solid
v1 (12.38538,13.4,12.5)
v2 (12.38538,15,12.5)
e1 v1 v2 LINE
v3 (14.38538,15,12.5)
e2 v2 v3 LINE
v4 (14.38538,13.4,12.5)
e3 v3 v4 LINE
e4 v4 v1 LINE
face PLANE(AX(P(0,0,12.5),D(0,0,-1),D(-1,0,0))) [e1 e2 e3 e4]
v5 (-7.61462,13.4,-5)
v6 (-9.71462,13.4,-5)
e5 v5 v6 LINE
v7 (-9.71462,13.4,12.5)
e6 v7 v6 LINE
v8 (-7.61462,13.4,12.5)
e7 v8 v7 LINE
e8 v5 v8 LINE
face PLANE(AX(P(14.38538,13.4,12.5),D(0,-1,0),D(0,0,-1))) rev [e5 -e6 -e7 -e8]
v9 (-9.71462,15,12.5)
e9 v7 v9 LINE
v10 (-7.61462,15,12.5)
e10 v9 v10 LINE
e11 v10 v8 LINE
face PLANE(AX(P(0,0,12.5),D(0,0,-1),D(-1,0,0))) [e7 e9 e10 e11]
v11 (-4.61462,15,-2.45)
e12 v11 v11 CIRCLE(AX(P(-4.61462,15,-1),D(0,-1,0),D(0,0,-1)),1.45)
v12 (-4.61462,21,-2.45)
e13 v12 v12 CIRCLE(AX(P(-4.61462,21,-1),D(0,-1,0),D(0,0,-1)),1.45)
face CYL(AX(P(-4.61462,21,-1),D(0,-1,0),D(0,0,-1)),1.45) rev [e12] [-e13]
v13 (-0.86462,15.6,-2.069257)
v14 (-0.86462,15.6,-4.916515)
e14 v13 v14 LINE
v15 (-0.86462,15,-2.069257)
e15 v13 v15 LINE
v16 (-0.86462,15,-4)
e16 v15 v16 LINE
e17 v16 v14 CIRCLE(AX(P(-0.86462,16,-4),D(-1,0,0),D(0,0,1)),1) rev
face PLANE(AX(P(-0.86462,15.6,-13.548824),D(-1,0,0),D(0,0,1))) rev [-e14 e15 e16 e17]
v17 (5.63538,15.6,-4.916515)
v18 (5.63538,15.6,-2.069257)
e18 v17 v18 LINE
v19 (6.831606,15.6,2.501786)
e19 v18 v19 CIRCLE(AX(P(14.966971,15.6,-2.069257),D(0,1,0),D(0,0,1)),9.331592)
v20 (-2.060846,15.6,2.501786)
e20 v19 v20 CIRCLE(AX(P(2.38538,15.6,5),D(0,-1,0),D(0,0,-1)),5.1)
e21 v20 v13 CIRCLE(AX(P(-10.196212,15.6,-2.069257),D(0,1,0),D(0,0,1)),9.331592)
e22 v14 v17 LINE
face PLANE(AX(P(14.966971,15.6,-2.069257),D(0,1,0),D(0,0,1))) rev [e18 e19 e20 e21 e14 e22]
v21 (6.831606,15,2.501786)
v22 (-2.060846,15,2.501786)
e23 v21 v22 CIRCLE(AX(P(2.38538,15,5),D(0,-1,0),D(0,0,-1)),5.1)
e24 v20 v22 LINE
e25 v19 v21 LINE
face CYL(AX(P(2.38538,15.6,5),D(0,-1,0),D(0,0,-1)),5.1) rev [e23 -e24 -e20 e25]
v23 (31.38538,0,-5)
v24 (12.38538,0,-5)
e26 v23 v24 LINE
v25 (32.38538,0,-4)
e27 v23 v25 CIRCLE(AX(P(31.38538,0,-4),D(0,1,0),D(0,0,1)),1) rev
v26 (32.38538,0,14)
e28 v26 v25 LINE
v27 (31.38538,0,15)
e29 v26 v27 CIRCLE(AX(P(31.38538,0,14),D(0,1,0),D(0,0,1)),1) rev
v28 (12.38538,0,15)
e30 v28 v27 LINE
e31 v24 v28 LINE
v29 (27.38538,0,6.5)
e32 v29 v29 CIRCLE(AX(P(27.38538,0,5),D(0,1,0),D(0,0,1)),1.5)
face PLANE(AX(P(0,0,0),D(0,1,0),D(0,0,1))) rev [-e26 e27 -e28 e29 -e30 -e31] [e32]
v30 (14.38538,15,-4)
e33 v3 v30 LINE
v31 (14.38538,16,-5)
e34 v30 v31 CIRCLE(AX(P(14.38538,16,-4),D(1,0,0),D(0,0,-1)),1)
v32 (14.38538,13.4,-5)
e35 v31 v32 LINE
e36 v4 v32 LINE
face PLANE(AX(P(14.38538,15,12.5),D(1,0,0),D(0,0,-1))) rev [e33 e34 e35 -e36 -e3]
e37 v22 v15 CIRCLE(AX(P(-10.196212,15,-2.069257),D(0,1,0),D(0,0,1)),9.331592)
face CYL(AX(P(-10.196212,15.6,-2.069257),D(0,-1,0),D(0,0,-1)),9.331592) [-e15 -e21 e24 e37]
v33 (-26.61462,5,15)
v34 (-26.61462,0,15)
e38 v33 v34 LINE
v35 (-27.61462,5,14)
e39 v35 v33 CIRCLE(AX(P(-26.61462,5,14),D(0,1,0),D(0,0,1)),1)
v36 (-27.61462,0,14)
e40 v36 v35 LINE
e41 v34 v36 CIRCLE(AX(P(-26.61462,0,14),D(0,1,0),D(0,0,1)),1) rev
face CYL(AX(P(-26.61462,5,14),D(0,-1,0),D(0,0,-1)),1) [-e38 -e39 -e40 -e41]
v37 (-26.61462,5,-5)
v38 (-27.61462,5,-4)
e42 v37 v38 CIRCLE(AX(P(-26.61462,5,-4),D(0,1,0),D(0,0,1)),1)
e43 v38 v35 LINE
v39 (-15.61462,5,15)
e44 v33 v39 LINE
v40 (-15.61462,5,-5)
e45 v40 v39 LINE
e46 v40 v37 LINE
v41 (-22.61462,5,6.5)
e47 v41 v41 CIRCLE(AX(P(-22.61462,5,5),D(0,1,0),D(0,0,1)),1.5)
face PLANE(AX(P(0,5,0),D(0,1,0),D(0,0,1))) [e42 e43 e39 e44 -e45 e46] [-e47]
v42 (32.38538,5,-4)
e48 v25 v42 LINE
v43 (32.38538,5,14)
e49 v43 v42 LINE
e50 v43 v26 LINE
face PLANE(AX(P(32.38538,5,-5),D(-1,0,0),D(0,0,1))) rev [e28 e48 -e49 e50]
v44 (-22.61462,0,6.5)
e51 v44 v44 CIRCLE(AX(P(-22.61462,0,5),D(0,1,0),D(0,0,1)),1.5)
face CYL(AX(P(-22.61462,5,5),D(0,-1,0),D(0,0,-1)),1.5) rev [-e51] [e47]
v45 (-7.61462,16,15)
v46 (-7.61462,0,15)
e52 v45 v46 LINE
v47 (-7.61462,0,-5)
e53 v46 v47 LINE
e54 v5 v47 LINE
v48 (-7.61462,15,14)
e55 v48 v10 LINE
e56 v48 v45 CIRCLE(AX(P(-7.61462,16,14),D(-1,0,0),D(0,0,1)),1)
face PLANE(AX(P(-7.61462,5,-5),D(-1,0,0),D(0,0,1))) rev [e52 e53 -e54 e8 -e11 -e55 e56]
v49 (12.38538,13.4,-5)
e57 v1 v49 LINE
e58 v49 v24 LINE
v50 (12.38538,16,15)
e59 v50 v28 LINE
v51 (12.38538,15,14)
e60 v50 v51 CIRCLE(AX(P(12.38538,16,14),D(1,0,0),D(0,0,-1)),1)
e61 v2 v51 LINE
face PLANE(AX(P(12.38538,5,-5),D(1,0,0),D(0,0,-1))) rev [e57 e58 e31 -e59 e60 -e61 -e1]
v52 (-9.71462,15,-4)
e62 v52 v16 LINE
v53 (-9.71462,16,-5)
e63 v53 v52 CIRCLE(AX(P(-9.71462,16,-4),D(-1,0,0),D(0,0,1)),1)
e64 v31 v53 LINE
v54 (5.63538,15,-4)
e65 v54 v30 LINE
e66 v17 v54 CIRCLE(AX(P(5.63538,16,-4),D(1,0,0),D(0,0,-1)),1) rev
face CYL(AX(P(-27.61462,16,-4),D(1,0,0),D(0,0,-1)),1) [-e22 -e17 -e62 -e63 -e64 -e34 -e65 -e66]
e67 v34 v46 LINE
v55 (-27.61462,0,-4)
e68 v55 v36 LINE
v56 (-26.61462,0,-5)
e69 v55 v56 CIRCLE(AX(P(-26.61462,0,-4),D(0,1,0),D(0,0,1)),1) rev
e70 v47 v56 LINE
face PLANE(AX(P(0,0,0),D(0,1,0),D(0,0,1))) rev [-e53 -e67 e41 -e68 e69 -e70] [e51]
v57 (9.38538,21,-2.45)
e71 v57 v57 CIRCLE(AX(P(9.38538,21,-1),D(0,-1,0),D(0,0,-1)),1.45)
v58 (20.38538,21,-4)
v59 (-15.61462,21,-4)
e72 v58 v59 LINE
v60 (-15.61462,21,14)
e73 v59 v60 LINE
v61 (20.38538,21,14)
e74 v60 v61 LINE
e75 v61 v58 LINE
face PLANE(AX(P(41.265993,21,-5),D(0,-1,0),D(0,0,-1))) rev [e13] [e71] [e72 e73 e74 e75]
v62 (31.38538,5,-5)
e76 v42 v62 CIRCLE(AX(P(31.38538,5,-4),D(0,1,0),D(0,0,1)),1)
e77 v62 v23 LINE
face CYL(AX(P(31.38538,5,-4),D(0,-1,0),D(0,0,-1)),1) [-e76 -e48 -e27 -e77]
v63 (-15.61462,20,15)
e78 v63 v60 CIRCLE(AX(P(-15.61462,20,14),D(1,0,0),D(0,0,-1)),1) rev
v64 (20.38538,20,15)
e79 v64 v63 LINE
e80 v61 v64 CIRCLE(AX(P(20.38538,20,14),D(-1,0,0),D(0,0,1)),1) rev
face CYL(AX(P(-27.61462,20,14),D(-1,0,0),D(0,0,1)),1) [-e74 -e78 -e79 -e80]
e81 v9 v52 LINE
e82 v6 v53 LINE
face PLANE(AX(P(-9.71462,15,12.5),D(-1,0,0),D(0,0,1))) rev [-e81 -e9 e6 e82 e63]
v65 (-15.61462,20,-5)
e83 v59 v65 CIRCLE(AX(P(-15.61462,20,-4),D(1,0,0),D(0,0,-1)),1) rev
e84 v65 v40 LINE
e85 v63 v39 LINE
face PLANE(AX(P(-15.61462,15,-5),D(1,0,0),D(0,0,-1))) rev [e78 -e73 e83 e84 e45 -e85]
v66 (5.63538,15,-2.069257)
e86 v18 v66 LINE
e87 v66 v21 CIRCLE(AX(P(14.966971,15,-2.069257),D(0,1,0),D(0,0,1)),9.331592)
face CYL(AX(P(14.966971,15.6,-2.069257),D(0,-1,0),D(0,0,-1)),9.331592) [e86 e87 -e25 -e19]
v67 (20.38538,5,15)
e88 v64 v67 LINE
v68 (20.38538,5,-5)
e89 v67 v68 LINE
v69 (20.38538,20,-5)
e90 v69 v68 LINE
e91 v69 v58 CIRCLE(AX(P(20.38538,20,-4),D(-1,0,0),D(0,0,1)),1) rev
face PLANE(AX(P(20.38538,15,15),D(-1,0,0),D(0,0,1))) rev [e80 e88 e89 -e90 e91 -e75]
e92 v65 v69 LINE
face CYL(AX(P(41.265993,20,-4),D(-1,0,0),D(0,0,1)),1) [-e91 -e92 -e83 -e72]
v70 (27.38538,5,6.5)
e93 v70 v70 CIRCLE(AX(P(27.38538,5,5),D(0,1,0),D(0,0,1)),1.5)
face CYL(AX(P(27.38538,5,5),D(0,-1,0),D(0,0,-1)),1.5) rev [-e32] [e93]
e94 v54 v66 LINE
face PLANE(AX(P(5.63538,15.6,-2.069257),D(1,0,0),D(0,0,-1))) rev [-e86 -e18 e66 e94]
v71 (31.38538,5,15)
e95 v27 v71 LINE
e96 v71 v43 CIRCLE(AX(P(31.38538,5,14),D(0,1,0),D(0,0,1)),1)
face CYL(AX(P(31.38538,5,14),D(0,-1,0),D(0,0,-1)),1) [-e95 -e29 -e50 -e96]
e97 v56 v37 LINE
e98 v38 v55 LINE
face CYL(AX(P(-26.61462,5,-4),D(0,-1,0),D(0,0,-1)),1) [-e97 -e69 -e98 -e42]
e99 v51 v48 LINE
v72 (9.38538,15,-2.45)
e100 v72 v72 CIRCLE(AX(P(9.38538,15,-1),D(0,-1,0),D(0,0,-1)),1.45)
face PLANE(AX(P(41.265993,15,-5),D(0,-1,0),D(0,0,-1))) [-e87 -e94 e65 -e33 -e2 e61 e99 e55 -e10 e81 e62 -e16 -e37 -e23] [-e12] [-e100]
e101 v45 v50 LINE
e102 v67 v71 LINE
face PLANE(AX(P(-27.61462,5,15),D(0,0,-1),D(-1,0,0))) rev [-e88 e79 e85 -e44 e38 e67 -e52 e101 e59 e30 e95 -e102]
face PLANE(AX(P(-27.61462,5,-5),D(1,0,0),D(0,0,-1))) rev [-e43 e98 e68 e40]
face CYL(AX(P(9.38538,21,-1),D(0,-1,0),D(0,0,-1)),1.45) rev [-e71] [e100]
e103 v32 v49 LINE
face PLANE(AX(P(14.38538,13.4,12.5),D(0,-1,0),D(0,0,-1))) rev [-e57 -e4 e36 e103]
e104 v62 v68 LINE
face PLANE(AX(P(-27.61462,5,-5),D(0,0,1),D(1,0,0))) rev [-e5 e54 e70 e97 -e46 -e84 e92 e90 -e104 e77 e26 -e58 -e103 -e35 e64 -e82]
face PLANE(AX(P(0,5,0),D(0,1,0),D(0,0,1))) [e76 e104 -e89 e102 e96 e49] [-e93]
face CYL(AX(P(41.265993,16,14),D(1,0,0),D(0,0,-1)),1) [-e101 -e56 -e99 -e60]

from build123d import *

# Parameters (mm, degrees)
SKETCH1_W             = 20
SKETCH1_H             = 20
SKETCH1_R             = 1.5
BOSS_EXTRUDE1_DEPTH   = 5
BOSS_EXTRUDE1_2_DEPTH = 5
SKETCH2_W             = 8
SKETCH2_H             = 20
BOSS_EXTRUDE2_DEPTH   = 10
SKETCH3_W             = 20
SKETCH3_H             = 6
BOSS_EXTRUDE3_DEPTH   = 36
CUT_EXTRUDE1_DEPTH    = 0.6
SKETCH6_W             = 24.1
SKETCH6_H             = 1.6
CUT_EXTRUDE2_DEPTH    = 17.5
FILLET1_R             = 1
SKETCH8_R             = 1.45
CUT_EXTRUDE3_DEPTH    = 6
FILLET2_R             = 1


# Some blends are built 0.0001 mm under size
with BuildPart() as part:
    # Sketch1 → Boss-Extrude1 (new body)
    with BuildSketch(Plane(origin=(0, 0, 0), x_dir=(1, 0, 0), z_dir=(0, 1, 0))):
        with Locations((-17.614620188, -5)):
            Rectangle(SKETCH1_W, SKETCH1_H)
        with Locations(Location((-22.614620188, -5, 0), (0, 0, 270))):
            Circle(SKETCH1_R, mode=Mode.SUBTRACT)
    extrude(amount=BOSS_EXTRUDE1_DEPTH)



with BuildPart() as body_2:
    # Sketch1 → Boss-Extrude1 2 (new body)
    with BuildSketch(Plane(origin=(0, 0, 0), x_dir=(1, 0, 0), z_dir=(0, 1, 0))):
        with Locations((22.385379812, -5)):
            Rectangle(SKETCH1_W, SKETCH1_H)
        with Locations(Location((27.385379812, -5, 0), (0, 0, 270))):
            Circle(SKETCH1_R, mode=Mode.SUBTRACT)
    extrude(amount=BOSS_EXTRUDE1_2_DEPTH)


with BuildPart() as part_1:
    add(part.part)

    add(body_2.part)  # Boss-Extrude2 merges body 2
    # Sketch2 → Boss-Extrude2 (add)
    with BuildSketch(Plane(origin=(0, 5, 0), x_dir=(1, 0, 0), z_dir=(0, 1, 0))):
        with Locations((-11.614620188, -5)):
            Rectangle(SKETCH2_W, SKETCH2_H)
        with Locations((16.385379812, -5)):
            Rectangle(SKETCH2_W, SKETCH2_H)
    extrude(amount=BOSS_EXTRUDE2_DEPTH)

    # Sketch3 → Boss-Extrude3 (add)
    with BuildSketch(Plane.ZY.offset(15.614620188)):
        with Locations((5, 18)):
            Rectangle(SKETCH3_W, SKETCH3_H)
    extrude(amount=-BOSS_EXTRUDE3_DEPTH)

    # Sketch4 → Cut-Extrude1 (cut)
    with BuildSketch(Plane.XZ.offset(-15)):
        with BuildLine():
            Line((5.635379812, -2.069256579), (5.635379812, -13.54882393))
            Line((5.635379812, -13.54882393), (-0.864620188, -13.54882393))
            Line((-0.864620188, -13.54882393), (-0.864620188, -2.069256579))
            ThreePointArc((-0.864620188, -2.069256579), (-1.168628736, 0.293230663), (-2.06084614, 2.501785681))
            ThreePointArc((-2.06084614, 2.501785681), (2.385379812, 10.1), (6.831605764, 2.501785681))
            ThreePointArc((6.831605764, 2.501785681), (5.93938836, 0.293230663), (5.635379812, -2.069256579))
        make_face()
    extrude(amount=-CUT_EXTRUDE1_DEPTH, mode=Mode.SUBTRACT)

    # Sketch6 → Cut-Extrude2 (cut)
    with BuildSketch(Plane(origin=(0, 0, -5), x_dir=(-1, 0, 0), z_dir=(0, 0, -1))):
        with Locations((-2.335379812, 14.2)):
            Rectangle(SKETCH6_W, SKETCH6_H)
    extrude(amount=-CUT_EXTRUDE2_DEPTH, mode=Mode.SUBTRACT)

    # Fillet1
    fillet1_edges = [part_1.edges().sort_by_distance(p)[0] for p in [
        (2.385379812, 21, -5),
        (2.385379812, 21, 15),
        (32.385379812, 2.5, 15),
        (32.385379812, 2.5, -5),
        (-27.614620188, 2.5, -5),
        (-27.614620188, 2.5, 15),
    ]]
    fillet(fillet1_edges, radius=FILLET1_R)

    # Sketch8 → Cut-Extrude3 (cut)
    with BuildSketch(Plane(origin=(0, 15, 0), x_dir=(-1, 0, 0), z_dir=(0, -1, 0))):
        with Locations(Location((4.614620188, 1, 0), (0, 0, 90))):
            Circle(SKETCH8_R)
        with Locations(Location((-9.385379812, 1, 0), (0, 0, 90))):
            Circle(SKETCH8_R)
    extrude(amount=-CUT_EXTRUDE3_DEPTH, mode=Mode.SUBTRACT)

    # Fillet2
    fillet2_edges = [part_1.edges().sort_by_distance(p)[0] for p in [
        (2.385379812, 15, 15),
    ]]
    fillet(fillet2_edges, radius=FILLET2_R)
    # the kernel refuses this fillet: 1 mm, written as the material it takes off along each edge
    with BuildSketch(Plane(origin=(1.635379812, 15, -5), x_dir=(0, 0, 1), z_dir=(-1, 0, 0))) as fillet2_2_piece_1:
        with BuildLine():
            CenterArc((FILLET2_R, FILLET2_R), FILLET2_R, 180, 90)
            Line((0, FILLET2_R), (-FILLET2_R * 0.02, FILLET2_R))
            Line((-FILLET2_R * 0.02, FILLET2_R), (-FILLET2_R * 0.02, -FILLET2_R * 0.02))
            Line((-FILLET2_R * 0.02, -FILLET2_R * 0.02), (FILLET2_R, -FILLET2_R * 0.02))
            Line((FILLET2_R, -FILLET2_R * 0.02), (FILLET2_R, 0))
        make_face()
    extrude(amount=11.35, mode=Mode.SUBTRACT)
    fillet2_3_edges = [part_1.edges().sort_by_distance(p)[0] for p in [
        (10.010379812, 15, -5),
    ]]
    fillet(fillet2_3_edges, radius=FILLET2_R - 0.0001)  # a hair under: the kernel refuses the full size


solid = part_1.part
